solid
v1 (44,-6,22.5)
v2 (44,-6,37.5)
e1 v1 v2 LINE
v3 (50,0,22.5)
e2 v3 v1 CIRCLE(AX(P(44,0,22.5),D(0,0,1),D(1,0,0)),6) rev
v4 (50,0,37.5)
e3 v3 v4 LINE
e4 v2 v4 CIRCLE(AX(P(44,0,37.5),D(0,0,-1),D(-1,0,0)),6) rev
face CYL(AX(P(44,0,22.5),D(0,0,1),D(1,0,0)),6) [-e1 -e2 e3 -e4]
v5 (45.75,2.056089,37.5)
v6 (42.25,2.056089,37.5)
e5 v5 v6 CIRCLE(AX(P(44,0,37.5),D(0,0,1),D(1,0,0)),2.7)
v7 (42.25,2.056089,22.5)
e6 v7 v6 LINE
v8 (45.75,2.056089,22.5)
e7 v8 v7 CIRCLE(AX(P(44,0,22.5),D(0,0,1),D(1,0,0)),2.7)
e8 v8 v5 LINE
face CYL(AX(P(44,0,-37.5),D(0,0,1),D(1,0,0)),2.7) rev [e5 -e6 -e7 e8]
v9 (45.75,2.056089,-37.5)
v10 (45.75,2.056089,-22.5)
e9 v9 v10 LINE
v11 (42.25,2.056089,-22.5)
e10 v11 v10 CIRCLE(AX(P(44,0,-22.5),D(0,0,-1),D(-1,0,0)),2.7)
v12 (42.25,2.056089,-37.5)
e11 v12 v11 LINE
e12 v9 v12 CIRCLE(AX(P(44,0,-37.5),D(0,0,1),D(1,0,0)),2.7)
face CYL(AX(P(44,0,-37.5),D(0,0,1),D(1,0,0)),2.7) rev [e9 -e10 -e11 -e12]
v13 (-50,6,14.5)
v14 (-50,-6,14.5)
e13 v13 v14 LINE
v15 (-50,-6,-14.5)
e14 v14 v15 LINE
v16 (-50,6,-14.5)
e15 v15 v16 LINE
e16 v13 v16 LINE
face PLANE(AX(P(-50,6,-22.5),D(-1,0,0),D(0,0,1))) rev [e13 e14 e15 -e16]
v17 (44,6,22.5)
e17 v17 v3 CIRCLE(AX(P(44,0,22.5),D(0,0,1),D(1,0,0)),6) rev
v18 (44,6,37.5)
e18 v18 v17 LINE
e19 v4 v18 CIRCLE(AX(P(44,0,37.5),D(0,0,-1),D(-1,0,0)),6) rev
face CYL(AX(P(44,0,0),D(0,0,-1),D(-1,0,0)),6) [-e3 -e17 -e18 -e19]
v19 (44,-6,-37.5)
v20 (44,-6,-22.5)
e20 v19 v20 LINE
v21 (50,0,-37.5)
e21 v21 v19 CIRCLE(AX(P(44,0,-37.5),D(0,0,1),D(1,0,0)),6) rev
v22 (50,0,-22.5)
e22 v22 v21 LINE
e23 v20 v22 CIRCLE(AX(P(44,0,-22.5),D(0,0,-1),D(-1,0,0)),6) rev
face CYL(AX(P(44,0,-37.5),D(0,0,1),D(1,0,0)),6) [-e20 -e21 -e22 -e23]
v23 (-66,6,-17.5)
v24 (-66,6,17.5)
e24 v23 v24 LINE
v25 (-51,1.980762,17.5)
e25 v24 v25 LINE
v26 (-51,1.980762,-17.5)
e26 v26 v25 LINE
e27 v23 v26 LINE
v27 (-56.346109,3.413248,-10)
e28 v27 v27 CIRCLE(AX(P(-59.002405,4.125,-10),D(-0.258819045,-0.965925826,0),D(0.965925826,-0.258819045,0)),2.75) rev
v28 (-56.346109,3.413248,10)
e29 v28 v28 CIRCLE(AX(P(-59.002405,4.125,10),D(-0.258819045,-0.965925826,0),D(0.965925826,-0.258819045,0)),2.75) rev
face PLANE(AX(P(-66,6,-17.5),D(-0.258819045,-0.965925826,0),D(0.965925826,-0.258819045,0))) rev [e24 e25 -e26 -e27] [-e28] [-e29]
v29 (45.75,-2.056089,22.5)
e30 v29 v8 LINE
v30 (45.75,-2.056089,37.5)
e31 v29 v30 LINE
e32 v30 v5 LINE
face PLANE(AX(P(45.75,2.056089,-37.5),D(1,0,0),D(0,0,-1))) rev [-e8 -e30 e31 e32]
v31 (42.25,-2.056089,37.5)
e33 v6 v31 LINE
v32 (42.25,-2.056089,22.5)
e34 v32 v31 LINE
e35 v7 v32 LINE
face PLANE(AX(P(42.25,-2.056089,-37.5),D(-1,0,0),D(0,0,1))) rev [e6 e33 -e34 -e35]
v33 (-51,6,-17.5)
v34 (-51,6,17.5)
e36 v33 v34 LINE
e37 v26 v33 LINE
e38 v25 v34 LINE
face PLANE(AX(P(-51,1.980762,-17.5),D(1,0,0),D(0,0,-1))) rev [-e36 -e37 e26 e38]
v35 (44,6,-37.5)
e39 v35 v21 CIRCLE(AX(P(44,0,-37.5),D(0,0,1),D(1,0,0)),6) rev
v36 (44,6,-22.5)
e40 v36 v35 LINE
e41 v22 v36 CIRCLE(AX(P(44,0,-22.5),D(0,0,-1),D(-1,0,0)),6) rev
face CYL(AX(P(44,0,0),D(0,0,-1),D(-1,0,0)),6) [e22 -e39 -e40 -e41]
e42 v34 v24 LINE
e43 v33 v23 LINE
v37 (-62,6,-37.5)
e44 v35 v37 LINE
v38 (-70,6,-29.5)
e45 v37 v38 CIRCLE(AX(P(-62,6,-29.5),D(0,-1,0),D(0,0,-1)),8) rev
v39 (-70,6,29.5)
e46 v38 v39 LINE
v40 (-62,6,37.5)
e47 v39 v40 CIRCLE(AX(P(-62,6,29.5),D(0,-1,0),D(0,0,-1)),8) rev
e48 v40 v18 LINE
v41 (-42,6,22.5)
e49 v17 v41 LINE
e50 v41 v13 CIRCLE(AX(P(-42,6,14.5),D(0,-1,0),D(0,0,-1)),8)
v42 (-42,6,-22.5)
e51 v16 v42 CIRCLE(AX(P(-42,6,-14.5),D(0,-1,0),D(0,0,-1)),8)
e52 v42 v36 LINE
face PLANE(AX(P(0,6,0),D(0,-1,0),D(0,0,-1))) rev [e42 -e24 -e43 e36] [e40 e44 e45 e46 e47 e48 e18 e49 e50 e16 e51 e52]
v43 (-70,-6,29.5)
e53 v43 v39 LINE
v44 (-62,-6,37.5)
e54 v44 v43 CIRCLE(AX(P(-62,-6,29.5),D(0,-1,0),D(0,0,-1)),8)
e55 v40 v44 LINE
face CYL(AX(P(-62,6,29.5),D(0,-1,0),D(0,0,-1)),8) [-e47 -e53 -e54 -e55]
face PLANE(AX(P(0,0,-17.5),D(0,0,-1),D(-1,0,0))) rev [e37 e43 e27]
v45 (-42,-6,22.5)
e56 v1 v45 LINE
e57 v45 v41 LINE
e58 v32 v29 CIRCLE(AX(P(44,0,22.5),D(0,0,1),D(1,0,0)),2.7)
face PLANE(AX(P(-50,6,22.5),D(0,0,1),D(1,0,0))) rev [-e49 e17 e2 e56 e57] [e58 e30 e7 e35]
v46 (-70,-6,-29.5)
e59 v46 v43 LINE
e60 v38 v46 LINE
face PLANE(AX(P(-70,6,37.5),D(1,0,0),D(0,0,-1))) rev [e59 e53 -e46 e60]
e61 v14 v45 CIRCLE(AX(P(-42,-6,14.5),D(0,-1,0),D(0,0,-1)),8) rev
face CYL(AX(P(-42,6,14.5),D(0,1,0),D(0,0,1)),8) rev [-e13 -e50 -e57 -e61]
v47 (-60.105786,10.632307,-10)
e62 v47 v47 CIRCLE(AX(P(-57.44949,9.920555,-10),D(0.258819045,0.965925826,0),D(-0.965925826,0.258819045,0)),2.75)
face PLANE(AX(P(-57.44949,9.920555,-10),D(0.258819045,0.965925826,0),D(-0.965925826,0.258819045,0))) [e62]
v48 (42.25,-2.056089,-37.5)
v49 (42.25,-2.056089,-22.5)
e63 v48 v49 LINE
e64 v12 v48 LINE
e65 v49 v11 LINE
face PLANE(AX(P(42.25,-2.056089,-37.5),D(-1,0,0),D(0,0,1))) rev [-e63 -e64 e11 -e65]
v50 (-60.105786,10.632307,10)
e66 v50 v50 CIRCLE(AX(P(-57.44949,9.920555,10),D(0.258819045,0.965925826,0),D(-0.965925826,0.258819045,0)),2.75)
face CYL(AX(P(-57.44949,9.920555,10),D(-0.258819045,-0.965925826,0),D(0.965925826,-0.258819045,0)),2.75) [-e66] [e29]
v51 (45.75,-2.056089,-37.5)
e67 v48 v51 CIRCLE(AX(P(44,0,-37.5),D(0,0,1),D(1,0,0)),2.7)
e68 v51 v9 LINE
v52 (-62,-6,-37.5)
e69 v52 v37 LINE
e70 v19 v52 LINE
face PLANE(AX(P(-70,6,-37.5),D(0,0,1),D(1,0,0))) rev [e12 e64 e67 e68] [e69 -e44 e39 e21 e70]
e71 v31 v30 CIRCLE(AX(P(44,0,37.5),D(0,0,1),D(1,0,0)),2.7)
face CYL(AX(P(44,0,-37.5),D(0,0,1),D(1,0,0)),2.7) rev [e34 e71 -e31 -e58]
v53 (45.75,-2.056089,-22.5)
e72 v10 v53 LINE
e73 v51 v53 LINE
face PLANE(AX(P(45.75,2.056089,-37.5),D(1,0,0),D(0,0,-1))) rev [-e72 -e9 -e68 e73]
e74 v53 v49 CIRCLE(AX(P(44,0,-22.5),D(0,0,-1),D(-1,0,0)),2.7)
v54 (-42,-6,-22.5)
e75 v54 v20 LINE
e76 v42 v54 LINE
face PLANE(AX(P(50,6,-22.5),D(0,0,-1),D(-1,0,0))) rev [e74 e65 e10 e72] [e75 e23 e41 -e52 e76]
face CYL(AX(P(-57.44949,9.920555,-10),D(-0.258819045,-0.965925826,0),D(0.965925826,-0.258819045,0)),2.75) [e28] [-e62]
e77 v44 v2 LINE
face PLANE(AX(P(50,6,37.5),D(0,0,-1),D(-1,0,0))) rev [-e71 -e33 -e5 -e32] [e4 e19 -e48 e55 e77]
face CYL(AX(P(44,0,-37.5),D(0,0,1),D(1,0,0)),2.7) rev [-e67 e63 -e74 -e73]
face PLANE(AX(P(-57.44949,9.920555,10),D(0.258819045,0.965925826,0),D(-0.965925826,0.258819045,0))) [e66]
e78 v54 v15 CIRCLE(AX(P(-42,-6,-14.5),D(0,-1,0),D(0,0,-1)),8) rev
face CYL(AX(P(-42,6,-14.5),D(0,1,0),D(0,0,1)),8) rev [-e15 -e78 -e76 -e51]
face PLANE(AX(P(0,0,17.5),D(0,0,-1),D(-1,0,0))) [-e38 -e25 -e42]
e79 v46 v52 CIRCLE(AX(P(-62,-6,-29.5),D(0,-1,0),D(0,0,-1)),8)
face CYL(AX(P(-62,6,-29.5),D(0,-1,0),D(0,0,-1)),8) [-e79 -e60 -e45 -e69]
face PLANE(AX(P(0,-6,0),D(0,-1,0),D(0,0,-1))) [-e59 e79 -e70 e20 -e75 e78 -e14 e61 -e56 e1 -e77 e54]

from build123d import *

# Parameters (mm, degrees)
BOSS_EXTRUDE1_DEPTH = 6
FILLET1_R           = 6
FILLET2_R           = 8
CUT_EXTRUDE1_DEPTH  = 17.5
SKETCH5_R           = 2.75
BOSS_EXTRUDE2_DEPTH = 6
CUT_EXTRUDE2_DEPTH  = 104.140903424


with BuildPart() as part:
    # Sketch1 → Boss-Extrude1 (new, symmetric)
    with BuildSketch(Plane(origin=(0, 0, 0), x_dir=(1, 0, 0), z_dir=(0, 1, 0))):
        Polygon((50, 37.5), (50, 22.5), (-50, 22.5), (-50, -22.5), (50, -22.5), (50, -37.5), (-70, -37.5), (-70, 37.5), align=None)
    extrude(amount=BOSS_EXTRUDE1_DEPTH, both=True)

    # Fillet1
    fillet1_edges = [part.edges().sort_by_distance(p)[0] for p in [
        (50, 6, -30),
        (50, -6, -30),
        (50, -6, 30),
        (50, 6, 30),
    ]]
    fillet(fillet1_edges, radius=FILLET1_R - 0.0001)  # a hair under: the kernel refuses the full size

    # Fillet2
    fillet2_edges = [part.edges().sort_by_distance(p)[0] for p in [
        (-50, 0, -22.5),
        (-50, 0, 22.5),
        (-70, 0, 37.5),
        (-70, 0, -37.5),
    ]]
    fillet(fillet2_edges, radius=FILLET2_R)

    # Sketch4 → Cut-Extrude1 (cut, symmetric)
    with BuildSketch(Plane.XY):
        Polygon((-66, 6), (-51, 1.980762114), (-51, 6), align=None)
    extrude(amount=CUT_EXTRUDE1_DEPTH, both=True, mode=Mode.SUBTRACT)

    # Sketch5 → Boss-Extrude2 (add)
    with BuildSketch(Plane(origin=(-2.921161675, -10.901923789, 0), x_dir=(0.9659258262890701, -0.25881904510251424, 0), z_dir=(0.25881904510251424, 0.9659258262890701, 0))):
        with Locations((-58.059575109, 10)):
            Circle(SKETCH5_R)
        with Locations((-58.059575109, -10)):
            Circle(SKETCH5_R)
    extrude(amount=BOSS_EXTRUDE2_DEPTH)

    # Sketch6 → Cut-Extrude2 (cut, through all)
    with BuildSketch(Plane.XY.offset(37.5)):
        with BuildLine():
            Line((42.25, -2.056088519), (42.25, 2.056088519))
            ThreePointArc((42.25, 2.056088519), (44, 2.7), (45.75, 2.056088519))
            Line((45.75, 2.056088519), (45.75, -2.056088519))
            ThreePointArc((45.75, -2.056088519), (44, -2.7), (42.25, -2.056088519))
        make_face()
    extrude(amount=-CUT_EXTRUDE2_DEPTH, mode=Mode.SUBTRACT)


solid = part.part
